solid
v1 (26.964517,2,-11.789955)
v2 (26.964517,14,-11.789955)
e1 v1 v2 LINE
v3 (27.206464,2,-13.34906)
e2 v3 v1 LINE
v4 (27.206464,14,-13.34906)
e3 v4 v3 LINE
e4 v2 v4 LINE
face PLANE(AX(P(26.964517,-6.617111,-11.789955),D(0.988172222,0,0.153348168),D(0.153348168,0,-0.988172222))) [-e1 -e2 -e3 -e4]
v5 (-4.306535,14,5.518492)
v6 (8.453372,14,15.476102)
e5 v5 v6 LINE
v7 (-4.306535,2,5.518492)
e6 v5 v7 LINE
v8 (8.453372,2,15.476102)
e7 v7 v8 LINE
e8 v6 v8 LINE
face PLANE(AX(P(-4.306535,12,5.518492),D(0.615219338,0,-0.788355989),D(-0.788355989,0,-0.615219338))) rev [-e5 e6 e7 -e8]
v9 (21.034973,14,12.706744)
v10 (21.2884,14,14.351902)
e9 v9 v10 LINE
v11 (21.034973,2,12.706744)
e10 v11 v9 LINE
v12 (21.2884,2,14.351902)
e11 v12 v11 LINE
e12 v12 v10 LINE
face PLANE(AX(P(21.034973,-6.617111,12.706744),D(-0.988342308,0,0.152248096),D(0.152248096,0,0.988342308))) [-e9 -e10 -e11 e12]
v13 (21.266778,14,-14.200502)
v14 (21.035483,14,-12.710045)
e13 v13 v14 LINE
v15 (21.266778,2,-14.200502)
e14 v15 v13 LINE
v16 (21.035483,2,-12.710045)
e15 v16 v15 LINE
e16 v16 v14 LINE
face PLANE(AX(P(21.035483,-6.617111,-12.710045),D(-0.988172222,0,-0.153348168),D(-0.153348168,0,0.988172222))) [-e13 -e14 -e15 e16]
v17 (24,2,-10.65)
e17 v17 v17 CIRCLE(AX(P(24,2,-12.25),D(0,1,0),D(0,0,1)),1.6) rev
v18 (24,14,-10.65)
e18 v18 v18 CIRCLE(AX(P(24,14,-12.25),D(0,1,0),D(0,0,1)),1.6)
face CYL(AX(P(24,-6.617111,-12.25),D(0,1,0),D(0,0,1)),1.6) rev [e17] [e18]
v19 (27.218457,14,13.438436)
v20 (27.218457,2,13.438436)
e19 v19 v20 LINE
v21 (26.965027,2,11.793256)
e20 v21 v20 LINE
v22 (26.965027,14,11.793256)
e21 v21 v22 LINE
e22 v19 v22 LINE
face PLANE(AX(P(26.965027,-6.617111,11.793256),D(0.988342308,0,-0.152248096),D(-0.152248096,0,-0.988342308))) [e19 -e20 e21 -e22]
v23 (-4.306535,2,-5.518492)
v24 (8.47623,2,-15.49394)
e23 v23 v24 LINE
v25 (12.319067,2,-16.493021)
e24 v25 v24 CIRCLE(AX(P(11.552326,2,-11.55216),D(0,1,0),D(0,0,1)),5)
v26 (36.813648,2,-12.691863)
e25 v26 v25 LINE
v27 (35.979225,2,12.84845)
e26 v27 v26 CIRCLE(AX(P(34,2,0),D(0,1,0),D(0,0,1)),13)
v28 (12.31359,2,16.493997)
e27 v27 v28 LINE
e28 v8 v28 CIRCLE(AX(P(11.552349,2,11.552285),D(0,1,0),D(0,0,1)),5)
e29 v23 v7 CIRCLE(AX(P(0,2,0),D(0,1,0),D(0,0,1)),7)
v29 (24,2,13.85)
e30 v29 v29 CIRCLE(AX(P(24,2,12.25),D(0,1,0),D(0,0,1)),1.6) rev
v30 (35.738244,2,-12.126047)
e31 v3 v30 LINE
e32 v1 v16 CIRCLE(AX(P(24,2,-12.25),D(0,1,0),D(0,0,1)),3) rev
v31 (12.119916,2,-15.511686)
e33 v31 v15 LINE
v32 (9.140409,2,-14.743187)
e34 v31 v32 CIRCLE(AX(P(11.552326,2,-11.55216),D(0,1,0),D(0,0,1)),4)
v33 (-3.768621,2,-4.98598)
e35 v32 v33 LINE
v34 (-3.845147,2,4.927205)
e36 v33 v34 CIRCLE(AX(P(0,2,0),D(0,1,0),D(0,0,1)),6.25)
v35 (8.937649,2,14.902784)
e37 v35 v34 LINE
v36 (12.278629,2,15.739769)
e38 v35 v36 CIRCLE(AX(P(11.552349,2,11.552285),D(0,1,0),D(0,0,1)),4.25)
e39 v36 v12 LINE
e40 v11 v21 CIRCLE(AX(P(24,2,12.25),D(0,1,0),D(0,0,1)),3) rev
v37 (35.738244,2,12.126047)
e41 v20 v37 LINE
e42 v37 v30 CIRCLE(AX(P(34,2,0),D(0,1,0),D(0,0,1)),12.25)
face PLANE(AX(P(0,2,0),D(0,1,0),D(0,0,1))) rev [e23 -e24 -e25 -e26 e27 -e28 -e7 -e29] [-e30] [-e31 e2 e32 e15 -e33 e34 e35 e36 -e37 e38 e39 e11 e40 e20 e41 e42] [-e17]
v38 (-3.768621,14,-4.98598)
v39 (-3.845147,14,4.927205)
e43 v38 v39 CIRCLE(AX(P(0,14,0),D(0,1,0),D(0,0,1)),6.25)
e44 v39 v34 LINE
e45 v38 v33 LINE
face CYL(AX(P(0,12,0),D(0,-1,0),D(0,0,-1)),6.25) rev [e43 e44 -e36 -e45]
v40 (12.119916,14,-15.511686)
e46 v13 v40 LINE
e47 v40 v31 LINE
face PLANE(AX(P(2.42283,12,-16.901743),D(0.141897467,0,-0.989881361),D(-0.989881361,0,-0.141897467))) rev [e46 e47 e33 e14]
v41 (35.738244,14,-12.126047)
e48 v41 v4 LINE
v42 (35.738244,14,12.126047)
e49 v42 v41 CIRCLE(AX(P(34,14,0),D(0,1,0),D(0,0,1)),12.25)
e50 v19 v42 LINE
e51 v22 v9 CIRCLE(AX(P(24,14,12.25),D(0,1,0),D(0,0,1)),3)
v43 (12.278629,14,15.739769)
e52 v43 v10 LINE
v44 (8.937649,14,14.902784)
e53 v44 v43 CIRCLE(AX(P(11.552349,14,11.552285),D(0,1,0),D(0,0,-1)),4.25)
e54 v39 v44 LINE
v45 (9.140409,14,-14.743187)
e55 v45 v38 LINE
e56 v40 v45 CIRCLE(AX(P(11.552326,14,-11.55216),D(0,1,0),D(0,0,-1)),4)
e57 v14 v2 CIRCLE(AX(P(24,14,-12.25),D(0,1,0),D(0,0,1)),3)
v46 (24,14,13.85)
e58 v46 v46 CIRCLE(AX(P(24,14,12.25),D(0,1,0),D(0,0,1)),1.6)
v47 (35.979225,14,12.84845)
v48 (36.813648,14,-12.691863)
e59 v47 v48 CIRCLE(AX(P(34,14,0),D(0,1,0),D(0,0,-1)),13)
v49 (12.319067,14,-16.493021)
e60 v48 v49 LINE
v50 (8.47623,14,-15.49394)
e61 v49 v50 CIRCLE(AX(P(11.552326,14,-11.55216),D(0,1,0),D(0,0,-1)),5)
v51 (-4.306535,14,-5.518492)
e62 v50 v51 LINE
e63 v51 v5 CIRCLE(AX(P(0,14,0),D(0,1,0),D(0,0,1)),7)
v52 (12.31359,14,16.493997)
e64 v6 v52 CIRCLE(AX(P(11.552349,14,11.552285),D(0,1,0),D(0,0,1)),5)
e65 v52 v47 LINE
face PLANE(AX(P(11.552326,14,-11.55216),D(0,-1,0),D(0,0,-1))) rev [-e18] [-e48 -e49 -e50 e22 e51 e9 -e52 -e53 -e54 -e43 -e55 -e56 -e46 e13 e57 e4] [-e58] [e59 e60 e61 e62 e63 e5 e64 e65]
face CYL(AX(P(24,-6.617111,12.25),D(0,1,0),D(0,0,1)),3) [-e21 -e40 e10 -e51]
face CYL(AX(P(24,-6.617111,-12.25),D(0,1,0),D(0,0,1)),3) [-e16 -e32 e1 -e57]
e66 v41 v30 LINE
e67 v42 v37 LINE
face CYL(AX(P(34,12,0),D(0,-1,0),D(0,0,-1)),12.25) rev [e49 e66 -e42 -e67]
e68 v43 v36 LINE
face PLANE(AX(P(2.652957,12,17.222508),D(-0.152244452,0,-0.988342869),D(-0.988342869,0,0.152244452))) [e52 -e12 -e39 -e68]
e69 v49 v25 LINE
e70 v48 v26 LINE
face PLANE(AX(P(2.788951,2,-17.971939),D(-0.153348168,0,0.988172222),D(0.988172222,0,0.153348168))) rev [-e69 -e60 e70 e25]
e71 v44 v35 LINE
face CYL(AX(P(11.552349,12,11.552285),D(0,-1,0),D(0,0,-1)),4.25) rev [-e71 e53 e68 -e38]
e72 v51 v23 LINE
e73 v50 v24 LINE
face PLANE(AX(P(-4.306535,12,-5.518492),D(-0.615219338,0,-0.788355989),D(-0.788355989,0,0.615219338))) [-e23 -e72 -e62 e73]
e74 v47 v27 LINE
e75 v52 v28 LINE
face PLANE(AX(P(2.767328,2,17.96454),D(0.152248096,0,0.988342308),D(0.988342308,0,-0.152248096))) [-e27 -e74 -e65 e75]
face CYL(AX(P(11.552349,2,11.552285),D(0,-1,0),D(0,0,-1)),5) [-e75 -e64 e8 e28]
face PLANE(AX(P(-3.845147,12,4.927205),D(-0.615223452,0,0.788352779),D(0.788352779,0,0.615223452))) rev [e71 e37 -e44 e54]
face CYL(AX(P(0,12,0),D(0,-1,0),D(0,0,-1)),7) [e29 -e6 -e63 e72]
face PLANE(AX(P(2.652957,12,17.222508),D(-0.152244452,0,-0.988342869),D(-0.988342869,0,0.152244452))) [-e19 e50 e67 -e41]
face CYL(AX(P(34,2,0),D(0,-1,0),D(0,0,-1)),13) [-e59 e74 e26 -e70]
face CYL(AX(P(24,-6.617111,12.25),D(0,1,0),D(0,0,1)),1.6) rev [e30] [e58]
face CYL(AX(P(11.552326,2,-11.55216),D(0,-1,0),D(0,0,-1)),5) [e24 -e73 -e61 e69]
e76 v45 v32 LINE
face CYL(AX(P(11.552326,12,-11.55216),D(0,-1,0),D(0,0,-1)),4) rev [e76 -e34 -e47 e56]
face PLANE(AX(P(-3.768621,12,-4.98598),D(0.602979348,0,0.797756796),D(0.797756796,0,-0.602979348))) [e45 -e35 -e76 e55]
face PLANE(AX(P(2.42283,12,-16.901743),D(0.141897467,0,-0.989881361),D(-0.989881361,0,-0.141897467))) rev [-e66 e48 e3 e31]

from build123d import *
from build123d.topology import SkipClean

# Parameters (mm, degrees)
SKETCH1_R               = 1.6
SKETCH1_R_2             = 1
SKETCH1_R_3             = 5.5
SKETCH1_R_4             = 4.5
BOSS_EXTRUDE2_DEPTH     = 2
BOSS_EXTRUDE3_START     = -2
SKETCH2_R               = 1
BOSS_EXTRUDE3_DEPTH     = 2
SKETCH3_R               = 1
CUT_EXTRUDE1_DEPTH      = 103
BOSS_EXTRUDE4_OUTLINE_R = 1
BOSS_EXTRUDE4_DEPTH     = 10
SKETCH5_R               = 87.063932705
CUT_EXTRUDE2_DEPTH      = 2
SKETCH6_R               = 1
BOSS_EXTRUDE5_DEPTH     = 2
SKETCH7_R               = 1.6
BOSS_EXTRUDE6_DEPTH     = 12
SKETCH8_R               = 1.6
CUT_EXTRUDE3_DEPTH      = 12


# Read off the part's stored shape, not the designer's step: Boss-Extrude4
with BuildPart() as part:
    # Sketch1 → Boss-Extrude2 (new body)
    with BuildSketch(Plane(origin=(0, 0, 0), x_dir=(1, 0, 0), z_dir=(0, 1, 0))):
        with BuildLine():
            Line((12.313589515, -16.493996637), (35.979225245, -12.848450001))
            ThreePointArc((35.979225245, -12.848450001), (46.993067566, -0.424494085), (36.813648041, 12.691862933))
            Line((36.813648041, 12.691862933), (35.165189196, 12.947676785))
            Line((35.165189196, 12.947676785), (12.319067304, 16.493021261))
            ThreePointArc((12.319067304, 16.493021261), (11.720527595, 16.549330191), (11.119556233, 16.533395936))
            Line((11.119556233, 16.533395936), (-11.812019178, 14.541098507))
            ThreePointArc((-11.812019178, 14.541098507), (-13.247239988, 14.027709898), (-14.244912332, 12.87528787))
            Line((-14.244912332, 12.87528787), (-19.487592157, 2.204884721))
            ThreePointArc((-19.487592157, 2.204884721), (-19.693653105, -1.723258696), (-16.994761113, -4.584858569))
            Line((-16.994761113, -4.584858569), (9.557587922, -16.137143667))
            ThreePointArc((9.557587922, -16.137143667), (10.910298182, -16.51089082), (12.313589515, -16.493996637))
        make_face()
        with Locations(Location((11.552349036, -11.552285098, 0), (0, 0, 270))):
            Circle(SKETCH1_R, mode=Mode.SUBTRACT)
        with Locations(Location((25, -11, 0), (0, 0, 270))):
            Circle(SKETCH1_R_2, mode=Mode.SUBTRACT)
        with Locations(Location((-15, 0, 0), (0, 0, 270))):
            Circle(SKETCH1_R, mode=Mode.SUBTRACT)
        with Locations(Location((0, 0, 0), (0, 0, 270))):
            Circle(SKETCH1_R_3, mode=Mode.SUBTRACT)
        with Locations(Location((-11.552357038, 11.552357038, 0), (0, 0, 270))):
            Circle(SKETCH1_R, mode=Mode.SUBTRACT)
        with Locations(Location((11.552326466, 11.552160153, 0), (0, 0, 270))):
            Circle(SKETCH1_R, mode=Mode.SUBTRACT)
        with Locations(Location((14, 0, 0), (0, 0, 270))):
            Circle(SKETCH1_R_4, mode=Mode.SUBTRACT)
        with Locations(Location((34, 0, 0), (0, 0, 270))):
            Circle(SKETCH1_R_4, mode=Mode.SUBTRACT)
        with Locations(Location((25, 11, 0), (0, 0, 270))):
            Circle(SKETCH1_R_2, mode=Mode.SUBTRACT)
    extrude(amount=BOSS_EXTRUDE2_DEPTH)

    # Sketch2 → Boss-Extrude3 (add)
    with BuildSketch(Plane(origin=(0, 2, 0), x_dir=(1, 0, 0), z_dir=(0, 1, 0)).offset(BOSS_EXTRUDE3_START)):
        with Locations((25, 11)):
            Circle(SKETCH2_R)
        with Locations((25, -11)):
            Circle(SKETCH2_R)
    extrude(amount=BOSS_EXTRUDE3_DEPTH)

    # Sketch3 → Cut-Extrude1 (cut)
    with BuildSketch(Plane(origin=(0, 2, 0), x_dir=(1, 0, 0), z_dir=(0, 1, 0))):
        with Locations(Location((24, 13, 0), (0, 0, 270))):
            Circle(SKETCH3_R)
        with Locations(Location((24, -13, 0), (0, 0, 270))):
            Circle(SKETCH3_R)
    extrude(amount=-CUT_EXTRUDE1_DEPTH, mode=Mode.SUBTRACT)

    # Boss-Extrude4 outline → Boss-Extrude4 (add)
    with SkipClean():  # the faces are left unmerged after this step: merging them gives an invalid solid
        with BuildSketch(Plane(origin=(0, 2, 0), x_dir=(1, 0, 0), z_dir=(0, 1, 0))):
            with BuildLine():
                ThreePointArc((8.453372169, -15.47610242), (10.277484332, -16.387026041), (12.313589515, -16.493996637))
                Line((12.313589515, -16.493996637), (35.979225245, -12.848450001))
                ThreePointArc((35.979225245, -12.848450001), (46.993067566, -0.424494085), (36.813648041, 12.691862933))
                Line((36.813648041, 12.691862933), (12.319067304, 16.493021261))
                ThreePointArc((12.319067304, 16.493021261), (10.294223964, 16.391290043), (8.476229775, 15.493940099))
                Line((8.476229775, 15.493940099), (-4.306535369, 5.518491924))
                ThreePointArc((-4.306535369, 5.518491924), (-7, 0), (-4.306535369, -5.518491924))
                Line((-4.306535369, -5.518491924), (8.453372169, -15.47610242))
            make_face()
            with Locations((24, -13)):
                Circle(BOSS_EXTRUDE4_OUTLINE_R, mode=Mode.SUBTRACT)
            with BuildLine():
                Line((35.738243971, -12.126046672), (26.117255626, -13.608064851))
                Line((26.117255626, -13.608064851), (25.976685738, -12.695511096))
                ThreePointArc((25.976685738, -12.695511096), (23.695511096, -11.023314262), (22.023314262, -13.304488904))
                Line((22.023314262, -13.304488904), (22.16388415, -14.217042659))
                Line((22.16388415, -14.217042659), (12.27862862, -15.739768587))
                ThreePointArc((12.27862862, -15.739768587), (10.519552717, -15.67488522), (8.937649363, -14.902784407))
                Line((8.937649363, -14.902784407), (-3.845146577, -4.927204867))
                ThreePointArc((-3.845146577, -4.927204867), (-6.249813783, 0.048245957), (-3.768620923, 4.985979978))
                Line((-3.768620923, 4.985979978), (9.140409076, 14.743187339))
                ThreePointArc((9.140409076, 14.743187339), (10.553310252, 15.425397379), (12.119916334, 15.511685597))
                Line((12.119916334, 15.511685597), (22.133828609, 14.076211769))
                Line((22.133828609, 14.076211769), (22.020237278, 13.283794934))
                ThreePointArc((22.020237278, 13.283794934), (23.716205066, 11.020237278), (25.979762722, 12.716205066))
                Line((25.979762722, 12.716205066), (26.093354053, 13.508621901))
                Line((26.093354053, 13.508621901), (35.738243971, 12.126046672))
                ThreePointArc((35.738243971, 12.126046672), (46.25, 0), (35.738243971, -12.126046672))
            make_face(mode=Mode.SUBTRACT)
            with Locations((24, 13)):
                Circle(BOSS_EXTRUDE4_OUTLINE_R, mode=Mode.SUBTRACT)
        extrude(amount=BOSS_EXTRUDE4_DEPTH)
    add(part.part.scale(1), mode=Mode.REPLACE)  # the faces are merged on a copy

    # Sketch5 → Cut-Extrude2 (cut)
    with BuildSketch(Plane(origin=(0, 0, 0), x_dir=(-1, 0, 0), z_dir=(0, -1, 0))):
        Circle(SKETCH5_R)
    extrude(amount=-CUT_EXTRUDE2_DEPTH, mode=Mode.SUBTRACT)

    # Sketch6 → Boss-Extrude5 (add)
    with SkipClean():  # the faces are left unmerged after this step: merging them gives an invalid solid
        with BuildSketch(Plane(origin=(0, 12, 0), x_dir=(1, 0, 0), z_dir=(0, 1, 0))):
            with BuildLine():
                Line((-4.306535369, 5.518491924), (8.476229775, 15.493940099))
                ThreePointArc((8.476229775, 15.493940099), (10.294223964, 16.391290043), (12.319067304, 16.493021261))
                Line((12.319067304, 16.493021261), (36.813648041, 12.691862933))
                ThreePointArc((36.813648041, 12.691862933), (46.993067566, -0.424494085), (35.979225245, -12.848450001))
                Line((35.979225245, -12.848450001), (12.313589515, -16.493996637))
                ThreePointArc((12.313589515, -16.493996637), (10.277484331, -16.387026041), (8.453372169, -15.47610242))
                Line((8.453372169, -15.47610242), (-4.306535369, -5.518491924))
                ThreePointArc((-4.306535369, -5.518491924), (-7, 0), (-4.306535369, 5.518491924))
            make_face()
            with Locations(Location((24, -13, 0), (0, 0, 270))):
                Circle(SKETCH6_R, mode=Mode.SUBTRACT)
            with Locations(Location((24, 13, 0), (0, 0, 270))):
                Circle(SKETCH6_R, mode=Mode.SUBTRACT)
            with BuildLine():
                Line((35.738243971, 12.126046672), (26.093354053, 13.508621901))
                Line((26.093354053, 13.508621901), (25.979762722, 12.716205066))
                ThreePointArc((25.979762722, 12.716205066), (23.716205066, 11.020237278), (22.020237278, 13.283794934))
                Line((22.020237278, 13.283794934), (22.133828609, 14.076211769))
                Line((22.133828609, 14.076211769), (12.119916334, 15.511685597))
                ThreePointArc((12.119916334, 15.511685597), (10.553310252, 15.425397379), (9.140409076, 14.743187339))
                Line((9.140409076, 14.743187339), (-3.768620923, 4.985979978))
                ThreePointArc((-3.768620923, 4.985979978), (-6.249813783, 0.048245957), (-3.845146577, -4.927204867))
                Line((-3.845146577, -4.927204867), (8.937649363, -14.902784407))
                ThreePointArc((8.937649363, -14.902784407), (10.519552717, -15.67488522), (12.27862862, -15.739768587))
                Line((12.27862862, -15.739768587), (22.16388415, -14.217042659))
                Line((22.16388415, -14.217042659), (22, -13))
                ThreePointArc((22, -13), (23.847309916, -11.005837083), (25.976685738, -12.695511096))
                Line((25.976685738, -12.695511096), (26.117255626, -13.608064851))
                Line((26.117255626, -13.608064851), (35.738243971, -12.126046672))
                ThreePointArc((35.738243971, -12.126046672), (46.25, 0), (35.738243971, 12.126046672))
            make_face(mode=Mode.SUBTRACT)
        extrude(amount=BOSS_EXTRUDE5_DEPTH)

    # Sketch7 → Boss-Extrude6 (add)
    # profile 1 of 2: a face of its own
    with BuildSketch(Plane(origin=(0, 14, 0), x_dir=(1, 0, 0), z_dir=(0, 1, 0))):
        with BuildLine():
            Line((22.591660568, 14.898882792), (26.144897094, 14.347478595))
            Line((26.144897094, 14.347478595), (27.332795496, 14.163136191))
            Line((27.332795496, 14.163136191), (26.964516665, 11.789955497))
            ThreePointArc((26.964516665, 11.789955497), (23.539955497, 9.285483335), (21.035483335, 12.710044503))
            Line((21.035483335, 12.710044503), (21.403762166, 15.083225196))
            Line((21.403762166, 15.083225196), (22.591660568, 14.898882792))
        make_face()
        with Locations((24, 12.25)):
            Circle(SKETCH7_R, mode=Mode.SUBTRACT)
    # profile 2 of 2: a face of its own
    with BuildSketch(Plane(origin=(0, 14, 0), x_dir=(1, 0, 0), z_dir=(0, 1, 0))):
        with BuildLine():
            Line((26.126412864, -14.366215568), (21.402696028, -15.093875294))
            Line((21.402696028, -15.093875294), (21.034973077, -12.706744287))
            ThreePointArc((21.034973077, -12.706744287), (23.543255713, -9.284973077), (26.965026923, -11.793255713))
            Line((26.965026923, -11.793255713), (27.332749874, -14.18038672))
            Line((27.332749874, -14.18038672), (26.126412864, -14.366215568))
        make_face()
        with Locations((24, -12.25)):
            Circle(SKETCH7_R, mode=Mode.SUBTRACT)
    extrude(amount=-BOSS_EXTRUDE6_DEPTH)

    # Sketch8 → Cut-Extrude3 (cut)
    with BuildSketch(Plane(origin=(0, 14, 0), x_dir=(1, 0, 0), z_dir=(0, 1, 0))):
        with Locations(Location((24, -12.25, 0), (0, 0, 270))):
            Circle(SKETCH8_R)
        with Locations(Location((24, 12.25, 0), (0, 0, 270))):
            Circle(SKETCH8_R)
    extrude(amount=-CUT_EXTRUDE3_DEPTH, mode=Mode.SUBTRACT)


solid = part.part
